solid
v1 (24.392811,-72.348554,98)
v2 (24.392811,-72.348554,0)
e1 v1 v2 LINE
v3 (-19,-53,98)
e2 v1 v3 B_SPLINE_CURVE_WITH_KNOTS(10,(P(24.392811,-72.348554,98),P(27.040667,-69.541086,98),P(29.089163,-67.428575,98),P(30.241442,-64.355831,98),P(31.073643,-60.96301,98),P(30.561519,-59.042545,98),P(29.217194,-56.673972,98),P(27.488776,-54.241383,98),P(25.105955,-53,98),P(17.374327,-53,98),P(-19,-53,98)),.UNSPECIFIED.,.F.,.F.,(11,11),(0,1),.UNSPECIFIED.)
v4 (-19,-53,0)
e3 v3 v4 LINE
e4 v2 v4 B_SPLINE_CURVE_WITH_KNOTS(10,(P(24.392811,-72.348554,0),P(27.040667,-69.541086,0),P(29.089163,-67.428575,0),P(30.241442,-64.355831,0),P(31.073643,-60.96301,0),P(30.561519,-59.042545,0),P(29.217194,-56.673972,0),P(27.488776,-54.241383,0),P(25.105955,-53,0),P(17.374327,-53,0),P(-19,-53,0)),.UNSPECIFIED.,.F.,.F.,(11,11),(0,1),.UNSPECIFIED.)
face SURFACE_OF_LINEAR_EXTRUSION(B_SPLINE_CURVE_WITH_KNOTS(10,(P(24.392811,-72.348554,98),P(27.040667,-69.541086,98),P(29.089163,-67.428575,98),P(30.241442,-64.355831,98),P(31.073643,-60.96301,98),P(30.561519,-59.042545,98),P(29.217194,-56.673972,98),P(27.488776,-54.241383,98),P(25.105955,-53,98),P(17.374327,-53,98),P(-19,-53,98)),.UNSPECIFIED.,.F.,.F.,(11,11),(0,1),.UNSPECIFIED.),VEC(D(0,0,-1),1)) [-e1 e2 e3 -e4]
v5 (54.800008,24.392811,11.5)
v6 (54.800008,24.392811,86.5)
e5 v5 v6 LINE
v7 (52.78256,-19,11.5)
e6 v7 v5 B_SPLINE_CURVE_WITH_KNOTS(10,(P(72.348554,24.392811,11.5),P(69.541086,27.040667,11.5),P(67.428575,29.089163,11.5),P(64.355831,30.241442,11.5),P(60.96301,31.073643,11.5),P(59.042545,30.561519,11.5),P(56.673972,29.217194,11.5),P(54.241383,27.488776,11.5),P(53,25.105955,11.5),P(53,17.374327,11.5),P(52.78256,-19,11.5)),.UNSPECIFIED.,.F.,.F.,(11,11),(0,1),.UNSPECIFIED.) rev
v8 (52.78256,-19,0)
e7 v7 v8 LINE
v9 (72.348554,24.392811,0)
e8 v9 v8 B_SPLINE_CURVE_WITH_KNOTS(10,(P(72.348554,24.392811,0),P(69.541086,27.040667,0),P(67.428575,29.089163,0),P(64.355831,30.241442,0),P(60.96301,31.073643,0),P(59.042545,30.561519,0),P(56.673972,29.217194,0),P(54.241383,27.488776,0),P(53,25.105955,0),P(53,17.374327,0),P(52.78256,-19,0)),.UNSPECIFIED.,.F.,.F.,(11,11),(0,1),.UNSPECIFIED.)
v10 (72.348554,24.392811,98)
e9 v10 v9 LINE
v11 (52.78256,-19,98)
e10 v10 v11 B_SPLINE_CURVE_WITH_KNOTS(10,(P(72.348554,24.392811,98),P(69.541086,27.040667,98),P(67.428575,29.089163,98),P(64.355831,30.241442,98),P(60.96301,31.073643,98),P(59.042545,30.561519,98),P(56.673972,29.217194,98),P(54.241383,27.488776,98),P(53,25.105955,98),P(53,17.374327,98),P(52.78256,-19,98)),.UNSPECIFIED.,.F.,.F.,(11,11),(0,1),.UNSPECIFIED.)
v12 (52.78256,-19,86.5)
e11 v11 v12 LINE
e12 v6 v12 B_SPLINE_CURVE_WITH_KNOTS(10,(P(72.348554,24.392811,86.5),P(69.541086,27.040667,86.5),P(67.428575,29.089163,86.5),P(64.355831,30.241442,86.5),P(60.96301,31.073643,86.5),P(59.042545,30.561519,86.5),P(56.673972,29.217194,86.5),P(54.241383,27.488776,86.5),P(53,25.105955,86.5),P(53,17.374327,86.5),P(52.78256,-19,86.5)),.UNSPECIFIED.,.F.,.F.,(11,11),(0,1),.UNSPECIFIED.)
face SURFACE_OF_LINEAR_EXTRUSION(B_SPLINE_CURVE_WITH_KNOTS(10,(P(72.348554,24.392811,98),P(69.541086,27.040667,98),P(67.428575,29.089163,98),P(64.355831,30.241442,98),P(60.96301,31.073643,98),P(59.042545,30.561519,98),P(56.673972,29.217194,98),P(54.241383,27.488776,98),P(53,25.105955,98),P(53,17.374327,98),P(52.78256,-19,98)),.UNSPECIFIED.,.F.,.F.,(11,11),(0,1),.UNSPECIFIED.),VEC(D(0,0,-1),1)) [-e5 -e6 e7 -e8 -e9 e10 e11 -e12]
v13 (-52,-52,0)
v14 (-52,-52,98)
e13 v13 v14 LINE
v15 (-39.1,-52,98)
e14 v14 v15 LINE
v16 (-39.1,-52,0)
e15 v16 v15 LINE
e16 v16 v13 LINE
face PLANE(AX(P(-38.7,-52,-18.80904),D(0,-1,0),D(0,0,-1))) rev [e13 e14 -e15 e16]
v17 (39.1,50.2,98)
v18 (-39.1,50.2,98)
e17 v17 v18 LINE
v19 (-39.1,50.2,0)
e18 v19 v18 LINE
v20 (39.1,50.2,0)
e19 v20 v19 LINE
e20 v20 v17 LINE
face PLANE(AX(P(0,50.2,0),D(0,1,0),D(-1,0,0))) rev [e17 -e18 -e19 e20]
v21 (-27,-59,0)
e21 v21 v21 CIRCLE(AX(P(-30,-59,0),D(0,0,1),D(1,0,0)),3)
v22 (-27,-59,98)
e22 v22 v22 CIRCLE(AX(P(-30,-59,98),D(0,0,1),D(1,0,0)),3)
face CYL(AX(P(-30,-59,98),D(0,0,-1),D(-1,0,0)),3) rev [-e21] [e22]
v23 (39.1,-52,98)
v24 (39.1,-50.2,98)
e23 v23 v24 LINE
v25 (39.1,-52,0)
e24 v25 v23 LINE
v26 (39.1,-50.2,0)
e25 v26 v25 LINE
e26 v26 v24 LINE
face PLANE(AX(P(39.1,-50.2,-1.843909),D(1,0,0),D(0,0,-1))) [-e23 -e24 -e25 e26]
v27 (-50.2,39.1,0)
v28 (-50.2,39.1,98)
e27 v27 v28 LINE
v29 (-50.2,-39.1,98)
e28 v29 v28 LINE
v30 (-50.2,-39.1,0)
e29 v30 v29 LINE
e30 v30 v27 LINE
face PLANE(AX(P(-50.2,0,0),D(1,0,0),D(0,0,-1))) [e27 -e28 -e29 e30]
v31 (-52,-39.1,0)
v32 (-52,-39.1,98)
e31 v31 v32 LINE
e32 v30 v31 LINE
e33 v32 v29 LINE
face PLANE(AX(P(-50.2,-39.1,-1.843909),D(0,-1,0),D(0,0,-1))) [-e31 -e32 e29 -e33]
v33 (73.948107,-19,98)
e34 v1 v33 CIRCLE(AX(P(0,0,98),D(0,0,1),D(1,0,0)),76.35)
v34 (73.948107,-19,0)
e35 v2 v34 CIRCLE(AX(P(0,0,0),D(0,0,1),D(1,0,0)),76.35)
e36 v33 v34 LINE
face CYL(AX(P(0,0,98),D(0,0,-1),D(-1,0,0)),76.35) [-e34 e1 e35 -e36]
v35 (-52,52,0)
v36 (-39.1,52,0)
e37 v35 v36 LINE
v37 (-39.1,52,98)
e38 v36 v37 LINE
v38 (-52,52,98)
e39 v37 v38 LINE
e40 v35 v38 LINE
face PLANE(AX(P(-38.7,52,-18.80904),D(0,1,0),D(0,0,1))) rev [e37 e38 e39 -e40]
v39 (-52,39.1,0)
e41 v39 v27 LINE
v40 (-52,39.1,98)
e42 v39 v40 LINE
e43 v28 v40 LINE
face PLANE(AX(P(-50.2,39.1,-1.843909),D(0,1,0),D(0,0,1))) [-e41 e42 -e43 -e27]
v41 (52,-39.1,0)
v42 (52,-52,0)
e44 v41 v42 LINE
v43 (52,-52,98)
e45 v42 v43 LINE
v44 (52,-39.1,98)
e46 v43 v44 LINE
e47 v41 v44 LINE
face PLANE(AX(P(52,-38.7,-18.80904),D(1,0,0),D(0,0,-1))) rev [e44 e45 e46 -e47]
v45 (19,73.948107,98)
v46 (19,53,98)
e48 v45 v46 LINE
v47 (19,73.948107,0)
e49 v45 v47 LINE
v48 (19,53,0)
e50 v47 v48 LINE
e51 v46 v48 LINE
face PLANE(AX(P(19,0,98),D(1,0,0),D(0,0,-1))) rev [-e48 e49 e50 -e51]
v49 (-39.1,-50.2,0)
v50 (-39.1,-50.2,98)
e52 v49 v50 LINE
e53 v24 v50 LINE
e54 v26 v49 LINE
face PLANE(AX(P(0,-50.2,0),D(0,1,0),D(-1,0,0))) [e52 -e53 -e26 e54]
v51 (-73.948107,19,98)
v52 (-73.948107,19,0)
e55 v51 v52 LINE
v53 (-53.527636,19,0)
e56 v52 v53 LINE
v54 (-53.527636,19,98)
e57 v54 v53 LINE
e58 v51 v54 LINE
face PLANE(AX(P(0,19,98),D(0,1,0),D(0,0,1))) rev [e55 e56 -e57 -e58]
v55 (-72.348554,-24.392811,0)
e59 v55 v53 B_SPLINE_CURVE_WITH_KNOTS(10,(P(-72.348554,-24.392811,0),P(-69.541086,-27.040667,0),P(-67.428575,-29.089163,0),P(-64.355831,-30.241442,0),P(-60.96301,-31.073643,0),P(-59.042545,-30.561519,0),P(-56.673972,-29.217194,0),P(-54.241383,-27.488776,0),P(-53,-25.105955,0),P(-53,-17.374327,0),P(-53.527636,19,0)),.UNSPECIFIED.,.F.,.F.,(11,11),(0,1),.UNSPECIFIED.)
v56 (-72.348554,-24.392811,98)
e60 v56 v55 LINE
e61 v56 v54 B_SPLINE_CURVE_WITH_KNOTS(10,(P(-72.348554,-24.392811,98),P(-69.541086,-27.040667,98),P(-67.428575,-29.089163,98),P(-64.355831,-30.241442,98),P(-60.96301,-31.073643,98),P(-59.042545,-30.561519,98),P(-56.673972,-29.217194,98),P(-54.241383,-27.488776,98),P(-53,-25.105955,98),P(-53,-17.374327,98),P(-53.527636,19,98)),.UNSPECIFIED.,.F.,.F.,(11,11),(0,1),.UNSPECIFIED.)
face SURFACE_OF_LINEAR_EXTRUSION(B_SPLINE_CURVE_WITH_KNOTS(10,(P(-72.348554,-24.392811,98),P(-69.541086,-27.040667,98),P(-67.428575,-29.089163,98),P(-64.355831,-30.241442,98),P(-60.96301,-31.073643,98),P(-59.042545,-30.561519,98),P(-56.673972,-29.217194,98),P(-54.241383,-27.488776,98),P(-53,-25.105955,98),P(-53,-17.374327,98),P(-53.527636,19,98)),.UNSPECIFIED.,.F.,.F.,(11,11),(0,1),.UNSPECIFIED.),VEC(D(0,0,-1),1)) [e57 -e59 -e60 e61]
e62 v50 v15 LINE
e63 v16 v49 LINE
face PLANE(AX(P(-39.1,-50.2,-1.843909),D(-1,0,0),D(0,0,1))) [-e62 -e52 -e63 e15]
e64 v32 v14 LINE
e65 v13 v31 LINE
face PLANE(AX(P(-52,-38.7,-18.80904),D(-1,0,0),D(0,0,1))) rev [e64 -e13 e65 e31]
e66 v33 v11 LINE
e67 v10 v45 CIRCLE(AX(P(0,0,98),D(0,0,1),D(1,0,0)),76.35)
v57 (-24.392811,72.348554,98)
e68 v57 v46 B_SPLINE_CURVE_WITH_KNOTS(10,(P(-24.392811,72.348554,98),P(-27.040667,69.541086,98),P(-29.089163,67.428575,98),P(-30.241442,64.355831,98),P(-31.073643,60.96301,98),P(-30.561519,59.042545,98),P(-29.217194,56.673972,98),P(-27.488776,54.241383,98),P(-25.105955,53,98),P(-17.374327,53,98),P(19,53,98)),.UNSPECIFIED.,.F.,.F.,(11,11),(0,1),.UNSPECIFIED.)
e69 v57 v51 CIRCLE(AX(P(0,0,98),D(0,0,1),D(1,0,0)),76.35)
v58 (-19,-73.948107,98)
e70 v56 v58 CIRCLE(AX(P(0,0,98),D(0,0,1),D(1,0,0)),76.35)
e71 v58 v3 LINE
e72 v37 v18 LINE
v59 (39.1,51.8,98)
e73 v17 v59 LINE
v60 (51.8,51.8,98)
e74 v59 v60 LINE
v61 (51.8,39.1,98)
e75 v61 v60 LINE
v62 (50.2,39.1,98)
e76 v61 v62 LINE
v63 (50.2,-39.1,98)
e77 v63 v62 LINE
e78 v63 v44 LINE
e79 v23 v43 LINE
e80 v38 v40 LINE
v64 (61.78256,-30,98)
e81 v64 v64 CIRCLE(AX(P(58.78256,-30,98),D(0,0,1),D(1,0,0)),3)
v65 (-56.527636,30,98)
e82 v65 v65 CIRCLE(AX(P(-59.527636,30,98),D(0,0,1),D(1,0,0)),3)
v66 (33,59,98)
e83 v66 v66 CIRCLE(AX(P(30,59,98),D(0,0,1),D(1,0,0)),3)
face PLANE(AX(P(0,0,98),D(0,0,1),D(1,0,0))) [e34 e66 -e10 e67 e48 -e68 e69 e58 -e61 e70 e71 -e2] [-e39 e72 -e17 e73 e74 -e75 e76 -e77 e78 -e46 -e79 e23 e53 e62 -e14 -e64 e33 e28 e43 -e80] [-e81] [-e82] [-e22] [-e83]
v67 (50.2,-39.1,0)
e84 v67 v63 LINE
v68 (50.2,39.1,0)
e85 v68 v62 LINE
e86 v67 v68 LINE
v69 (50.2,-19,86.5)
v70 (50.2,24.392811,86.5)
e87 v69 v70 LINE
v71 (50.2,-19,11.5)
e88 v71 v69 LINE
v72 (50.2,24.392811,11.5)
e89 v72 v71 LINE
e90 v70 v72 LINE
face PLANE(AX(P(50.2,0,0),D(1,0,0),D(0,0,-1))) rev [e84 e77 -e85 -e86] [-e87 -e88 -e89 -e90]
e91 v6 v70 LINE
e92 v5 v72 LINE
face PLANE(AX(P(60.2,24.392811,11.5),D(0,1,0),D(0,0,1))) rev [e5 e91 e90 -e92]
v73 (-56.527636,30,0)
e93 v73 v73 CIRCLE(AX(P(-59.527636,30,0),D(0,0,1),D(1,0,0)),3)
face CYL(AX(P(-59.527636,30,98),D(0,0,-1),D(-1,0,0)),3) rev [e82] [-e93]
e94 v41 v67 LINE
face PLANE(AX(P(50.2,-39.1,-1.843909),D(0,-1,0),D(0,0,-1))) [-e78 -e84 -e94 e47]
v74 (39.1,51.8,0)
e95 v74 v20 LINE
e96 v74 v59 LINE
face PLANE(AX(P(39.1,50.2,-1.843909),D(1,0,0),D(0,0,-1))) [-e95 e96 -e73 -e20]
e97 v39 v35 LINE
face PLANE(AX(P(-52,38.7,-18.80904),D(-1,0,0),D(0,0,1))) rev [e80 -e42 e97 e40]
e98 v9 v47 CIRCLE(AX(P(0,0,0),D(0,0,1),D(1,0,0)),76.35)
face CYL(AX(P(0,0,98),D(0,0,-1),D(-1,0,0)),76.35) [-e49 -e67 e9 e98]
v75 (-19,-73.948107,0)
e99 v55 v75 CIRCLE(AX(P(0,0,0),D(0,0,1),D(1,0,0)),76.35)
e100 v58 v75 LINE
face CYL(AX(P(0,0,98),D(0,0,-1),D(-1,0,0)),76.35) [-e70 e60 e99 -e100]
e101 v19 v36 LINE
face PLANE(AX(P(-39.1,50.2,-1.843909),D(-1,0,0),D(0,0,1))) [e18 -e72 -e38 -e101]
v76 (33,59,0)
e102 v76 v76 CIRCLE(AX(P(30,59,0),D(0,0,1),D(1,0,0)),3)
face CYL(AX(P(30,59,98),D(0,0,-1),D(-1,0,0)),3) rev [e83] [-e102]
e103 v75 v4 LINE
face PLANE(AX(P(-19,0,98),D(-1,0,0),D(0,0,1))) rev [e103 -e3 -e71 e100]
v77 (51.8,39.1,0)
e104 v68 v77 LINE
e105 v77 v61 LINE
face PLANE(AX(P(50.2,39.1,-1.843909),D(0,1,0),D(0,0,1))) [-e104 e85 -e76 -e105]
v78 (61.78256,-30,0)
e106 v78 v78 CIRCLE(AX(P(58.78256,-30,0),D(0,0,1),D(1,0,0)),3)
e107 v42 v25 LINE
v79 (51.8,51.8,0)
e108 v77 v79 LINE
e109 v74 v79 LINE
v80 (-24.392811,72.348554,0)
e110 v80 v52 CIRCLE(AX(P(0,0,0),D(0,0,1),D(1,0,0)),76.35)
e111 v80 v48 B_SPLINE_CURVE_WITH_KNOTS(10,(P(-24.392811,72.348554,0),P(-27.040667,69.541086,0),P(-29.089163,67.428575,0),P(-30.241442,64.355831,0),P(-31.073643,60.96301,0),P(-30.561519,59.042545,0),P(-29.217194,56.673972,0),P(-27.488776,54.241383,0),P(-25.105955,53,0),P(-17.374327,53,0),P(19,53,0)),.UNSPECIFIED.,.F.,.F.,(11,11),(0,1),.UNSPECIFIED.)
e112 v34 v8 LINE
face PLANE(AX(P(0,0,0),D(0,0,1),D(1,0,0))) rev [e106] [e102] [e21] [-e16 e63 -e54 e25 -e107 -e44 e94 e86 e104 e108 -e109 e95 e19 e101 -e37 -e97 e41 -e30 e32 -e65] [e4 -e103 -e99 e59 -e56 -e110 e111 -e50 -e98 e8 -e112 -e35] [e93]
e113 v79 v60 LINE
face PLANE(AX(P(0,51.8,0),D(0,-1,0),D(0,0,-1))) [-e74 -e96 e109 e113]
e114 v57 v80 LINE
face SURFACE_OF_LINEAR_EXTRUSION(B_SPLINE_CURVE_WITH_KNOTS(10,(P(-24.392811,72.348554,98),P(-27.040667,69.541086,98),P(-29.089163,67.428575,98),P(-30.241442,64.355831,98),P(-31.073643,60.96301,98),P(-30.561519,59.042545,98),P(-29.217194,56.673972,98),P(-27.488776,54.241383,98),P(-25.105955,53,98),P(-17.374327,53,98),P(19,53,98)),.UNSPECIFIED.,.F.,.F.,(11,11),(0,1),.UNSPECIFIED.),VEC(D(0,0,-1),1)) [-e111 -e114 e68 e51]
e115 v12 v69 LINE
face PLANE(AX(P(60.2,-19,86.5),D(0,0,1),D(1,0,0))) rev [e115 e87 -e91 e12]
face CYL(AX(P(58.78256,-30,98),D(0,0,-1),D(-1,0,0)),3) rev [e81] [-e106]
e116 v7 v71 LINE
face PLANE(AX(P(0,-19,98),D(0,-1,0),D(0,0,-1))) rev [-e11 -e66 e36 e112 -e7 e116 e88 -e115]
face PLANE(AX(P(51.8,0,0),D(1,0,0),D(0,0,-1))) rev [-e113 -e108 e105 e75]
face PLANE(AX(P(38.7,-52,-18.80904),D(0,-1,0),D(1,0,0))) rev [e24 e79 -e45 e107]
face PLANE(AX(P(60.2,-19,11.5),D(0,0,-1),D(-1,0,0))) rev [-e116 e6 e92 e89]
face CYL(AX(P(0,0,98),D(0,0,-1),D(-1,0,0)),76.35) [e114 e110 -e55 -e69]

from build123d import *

# Parameters (mm, degrees)
BOSS_EXTRUDE3_OUTLINE_R = 3
BOSS_EXTRUDE3_DEPTH     = 98
SKETCH3_R               = 3
BOSS_EXTRUDE4_DEPTH     = 5
CUT_EXTRUDE6_DEPTH      = 144.320079016
CUT_EXTRUDE6_DEPTH_BACK = 144.320079016
CUT_EXTRUDE9_DEPTH      = 98
SKETCH10_W              = 0.4
SKETCH10_H              = 1.8
SKETCH10_W_2            = 1.8
SKETCH10_H_2            = 0.4
SKETCH10_H_3            = 1.6
SKETCH10_W_3            = 1.6
BOSS_EXTRUDE5_DEPTH     = 98
SKETCH11_W              = 75
SKETCH11_H              = 43.392810524
CUT_EXTRUDE10_DEPTH     = 10


# Read off the part's stored shape, not the designer's step: Boss-Extrude3
with BuildPart() as part:
    # Boss-Extrude3 outline → Boss-Extrude3 (new body)
    with BuildSketch(Plane.XY):
        with BuildLine():
            ThreePointArc((-24.392810524, 72.348554199), (-55.939709188, 51.962211615), (-73.948106805, 19))
            Line((-73.948106805, 19), (-53.527635725, 19))
            add(Edge.make_bspline(
                [(-72.348554199, -24.392810524), (-69.541086329, -27.040667073), (-67.428574969, -29.089162938), (-64.355831171, -30.241441862), (-60.963009895, -31.073643307), (-59.042545022, -30.561519341), (-56.673971678, -29.217193929), (-54.241382838, -27.488775543), (-53, -25.105954954), (-53, -17.37432721), (-53.527635725, 19)],
                knots=[0, 0, 0, 0, 0, 0, 0, 0, 0, 0, 0, 1, 1, 1, 1, 1, 1, 1, 1, 1, 1, 1], degree=10))
            ThreePointArc((-72.348554199, -24.392810524), (-51.962211615, -55.939709188), (-19, -73.948106805))
            Line((-19, -73.948106805), (-19, -53))
            add(Edge.make_bspline(
                [(24.392810524, -72.348554199), (27.040667073, -69.541086329), (29.089162938, -67.428574969), (30.241441862, -64.355831171), (31.073643307, -60.963009895), (30.561519341, -59.042545022), (29.217193929, -56.673971678), (27.488775543, -54.241382838), (25.105954954, -53), (17.37432721, -53), (-19, -53)],
                knots=[0, 0, 0, 0, 0, 0, 0, 0, 0, 0, 0, 1, 1, 1, 1, 1, 1, 1, 1, 1, 1, 1], degree=10))
            ThreePointArc((24.392810524, -72.348554199), (55.939709188, -51.962211615), (73.948106805, -19))
            Line((73.948106805, -19), (52.782560411, -19))
            add(Edge.make_bspline(
                [(72.348554199, 24.392810524), (69.541086329, 27.040667073), (67.428574969, 29.089162938), (64.355831171, 30.241441862), (60.963009895, 31.073643307), (59.042545022, 30.561519341), (56.673971678, 29.217193929), (54.241382838, 27.488775543), (53, 25.105954954), (53, 17.37432721), (52.782560411, -19)],
                knots=[0, 0, 0, 0, 0, 0, 0, 0, 0, 0, 0, 1, 1, 1, 1, 1, 1, 1, 1, 1, 1, 1], degree=10))
            ThreePointArc((72.348554199, 24.392810524), (51.962211615, 55.939709188), (19, 73.948106805))
            Line((19, 73.948106805), (19, 53))
            add(Edge.make_bspline(
                [(-24.392810524, 72.348554199), (-27.040667073, 69.541086329), (-29.089162938, 67.428574969), (-30.241441862, 64.355831171), (-31.073643307, 60.963009895), (-30.561519341, 59.042545022), (-29.217193929, 56.673971678), (-27.488775543, 54.241382838), (-25.105954954, 53), (-17.37432721, 53), (19, 53)],
                knots=[0, 0, 0, 0, 0, 0, 0, 0, 0, 0, 0, 1, 1, 1, 1, 1, 1, 1, 1, 1, 1, 1], degree=10))
        make_face()
        with Locations((-30, -59)):
            Circle(BOSS_EXTRUDE3_OUTLINE_R, mode=Mode.SUBTRACT)
        with Locations((58.782560411, -30)):
            Circle(BOSS_EXTRUDE3_OUTLINE_R, mode=Mode.SUBTRACT)
        with Locations((-59.527635725, 30)):
            Circle(BOSS_EXTRUDE3_OUTLINE_R, mode=Mode.SUBTRACT)
        Polygon((-38.9, -51.6), (-51.6, -51.6), (-51.6, -38.9), (-50, -38.9), (-50, 38.9), (-51.6, 38.9), (-51.6, 51.6), (-38.9, 51.6), (-38.9, 50), (38.9, 50), (38.9, 51.6), (51.6, 51.6), (51.6, 38.9), (50, 38.9), (50, -38.9), (51.6, -38.9), (51.6, -51.6), (38.9, -51.6), (38.9, -50), (-38.9, -50), align=None, mode=Mode.SUBTRACT)
        with Locations((30, 59)):
            Circle(BOSS_EXTRUDE3_OUTLINE_R, mode=Mode.SUBTRACT)
    extrude(amount=BOSS_EXTRUDE3_DEPTH)

    # Sketch3 → Boss-Extrude4 (add)
    with BuildSketch(Plane.XY.offset(98)):
        with Locations((-59.527635725, 30)):
            Circle(SKETCH3_R)
    extrude(amount=BOSS_EXTRUDE4_DEPTH)


with BuildPart() as boss_extrude4_kept_piece:
    # of the separate pieces the step leaves, the one the design keeps (boss_extrude4_pieces_kept)
    add(part.part.solids().sort_by_distance((-24.392810524, 72.348554199, 0))[0])

    # Sketch5 → Cut-Extrude6 (cut, two sides: drawn at the far end of the back side and taken through both)
    with BuildSketch(Plane.XY.offset(98).offset(-CUT_EXTRUDE6_DEPTH_BACK)):
        Polygon((38.7, 51.8), (51.8, 51.8), (51.8, 38.7), (50.2, 38.7), (50.2, -38.7), (51.8, -38.7), (51.8, -51.8), (38.7, -51.8), (38.7, -50.2), (-38.7, -50.2), (-38.7, -51.8), (-51.8, -51.8), (-51.8, -38.7), (-50.2, -38.7), (-50.2, 38.7), (-51.8, 38.7), (-51.8, 51.8), (-38.7, 51.8), (-38.7, 50.2), (38.7, 50.2), align=None)
        Polygon((-38.9, -51.6), (-51.6, -51.6), (-51.6, -38.9), (-50, -38.9), (-50, 38.9), (-51.6, 38.9), (-51.6, 51.6), (-38.9, 51.6), (-38.9, 50), (38.9, 50), (38.9, 51.6), (51.6, 51.6), (51.6, 38.9), (50, 38.9), (50, -38.9), (51.6, -38.9), (51.6, -51.6), (38.9, -51.6), (38.9, -50), (-38.9, -50), align=None, mode=Mode.SUBTRACT)
    extrude(amount=CUT_EXTRUDE6_DEPTH + CUT_EXTRUDE6_DEPTH_BACK, mode=Mode.SUBTRACT)

    # Sketch6 → Cut-Extrude9 (cut)
    with BuildSketch(Plane.XY.offset(98)):
        Polygon((-51.8, 38.7), (-51.8, 51.8), (-38.7, 51.8), (-38.7, 52), (-52, 52), (-52, 38.7), align=None)
        Polygon((-38.7, -51.8), (-51.8, -51.8), (-51.8, -38.7), (-52, -38.7), (-52, -52), (-38.7, -52), align=None)
        Polygon((51.8, -38.7), (51.8, -51.8), (38.7, -51.8), (38.7, -52), (52, -52), (52, -38.7), align=None)
        Polygon((51.8, 38.7), (51.8, 51.8), (38.7, 51.8), (38.7, 51.6), (51.6, 51.6), (51.6, 38.7), align=None)
    extrude(amount=-CUT_EXTRUDE9_DEPTH, mode=Mode.SUBTRACT)

    # Sketch10 → Boss-Extrude5 (add)
    with BuildSketch(Plane.XY.offset(98)):
        with Locations((-38.9, 51.1)):
            Rectangle(SKETCH10_W, SKETCH10_H)
        with Locations((-51.1, 38.9)):
            Rectangle(SKETCH10_W_2, SKETCH10_H_2)
        with Locations((38.9, 51)):
            Rectangle(SKETCH10_W, SKETCH10_H_3)
        with Locations((51, 38.9)):
            Rectangle(SKETCH10_W_3, SKETCH10_H_2)
        with Locations((51.1, -38.9)):
            Rectangle(SKETCH10_W_2, SKETCH10_H_2)
        with Locations((38.9, -51.1)):
            Rectangle(SKETCH10_W, SKETCH10_H)
        with Locations((-51.1, -38.9)):
            Rectangle(SKETCH10_W_2, SKETCH10_H_2)
        with Locations((-38.9, -51.1)):
            Rectangle(SKETCH10_W, SKETCH10_H)
    extrude(amount=-BOSS_EXTRUDE5_DEPTH)

    # Sketch11 → Cut-Extrude10 (cut)
    with BuildSketch(Plane.ZY.offset(-50.2)):
        with Locations((49, 2.696405262)):
            Rectangle(SKETCH11_W, SKETCH11_H)
    extrude(amount=-CUT_EXTRUDE10_DEPTH, mode=Mode.SUBTRACT)


solid = boss_extrude4_kept_piece.part
